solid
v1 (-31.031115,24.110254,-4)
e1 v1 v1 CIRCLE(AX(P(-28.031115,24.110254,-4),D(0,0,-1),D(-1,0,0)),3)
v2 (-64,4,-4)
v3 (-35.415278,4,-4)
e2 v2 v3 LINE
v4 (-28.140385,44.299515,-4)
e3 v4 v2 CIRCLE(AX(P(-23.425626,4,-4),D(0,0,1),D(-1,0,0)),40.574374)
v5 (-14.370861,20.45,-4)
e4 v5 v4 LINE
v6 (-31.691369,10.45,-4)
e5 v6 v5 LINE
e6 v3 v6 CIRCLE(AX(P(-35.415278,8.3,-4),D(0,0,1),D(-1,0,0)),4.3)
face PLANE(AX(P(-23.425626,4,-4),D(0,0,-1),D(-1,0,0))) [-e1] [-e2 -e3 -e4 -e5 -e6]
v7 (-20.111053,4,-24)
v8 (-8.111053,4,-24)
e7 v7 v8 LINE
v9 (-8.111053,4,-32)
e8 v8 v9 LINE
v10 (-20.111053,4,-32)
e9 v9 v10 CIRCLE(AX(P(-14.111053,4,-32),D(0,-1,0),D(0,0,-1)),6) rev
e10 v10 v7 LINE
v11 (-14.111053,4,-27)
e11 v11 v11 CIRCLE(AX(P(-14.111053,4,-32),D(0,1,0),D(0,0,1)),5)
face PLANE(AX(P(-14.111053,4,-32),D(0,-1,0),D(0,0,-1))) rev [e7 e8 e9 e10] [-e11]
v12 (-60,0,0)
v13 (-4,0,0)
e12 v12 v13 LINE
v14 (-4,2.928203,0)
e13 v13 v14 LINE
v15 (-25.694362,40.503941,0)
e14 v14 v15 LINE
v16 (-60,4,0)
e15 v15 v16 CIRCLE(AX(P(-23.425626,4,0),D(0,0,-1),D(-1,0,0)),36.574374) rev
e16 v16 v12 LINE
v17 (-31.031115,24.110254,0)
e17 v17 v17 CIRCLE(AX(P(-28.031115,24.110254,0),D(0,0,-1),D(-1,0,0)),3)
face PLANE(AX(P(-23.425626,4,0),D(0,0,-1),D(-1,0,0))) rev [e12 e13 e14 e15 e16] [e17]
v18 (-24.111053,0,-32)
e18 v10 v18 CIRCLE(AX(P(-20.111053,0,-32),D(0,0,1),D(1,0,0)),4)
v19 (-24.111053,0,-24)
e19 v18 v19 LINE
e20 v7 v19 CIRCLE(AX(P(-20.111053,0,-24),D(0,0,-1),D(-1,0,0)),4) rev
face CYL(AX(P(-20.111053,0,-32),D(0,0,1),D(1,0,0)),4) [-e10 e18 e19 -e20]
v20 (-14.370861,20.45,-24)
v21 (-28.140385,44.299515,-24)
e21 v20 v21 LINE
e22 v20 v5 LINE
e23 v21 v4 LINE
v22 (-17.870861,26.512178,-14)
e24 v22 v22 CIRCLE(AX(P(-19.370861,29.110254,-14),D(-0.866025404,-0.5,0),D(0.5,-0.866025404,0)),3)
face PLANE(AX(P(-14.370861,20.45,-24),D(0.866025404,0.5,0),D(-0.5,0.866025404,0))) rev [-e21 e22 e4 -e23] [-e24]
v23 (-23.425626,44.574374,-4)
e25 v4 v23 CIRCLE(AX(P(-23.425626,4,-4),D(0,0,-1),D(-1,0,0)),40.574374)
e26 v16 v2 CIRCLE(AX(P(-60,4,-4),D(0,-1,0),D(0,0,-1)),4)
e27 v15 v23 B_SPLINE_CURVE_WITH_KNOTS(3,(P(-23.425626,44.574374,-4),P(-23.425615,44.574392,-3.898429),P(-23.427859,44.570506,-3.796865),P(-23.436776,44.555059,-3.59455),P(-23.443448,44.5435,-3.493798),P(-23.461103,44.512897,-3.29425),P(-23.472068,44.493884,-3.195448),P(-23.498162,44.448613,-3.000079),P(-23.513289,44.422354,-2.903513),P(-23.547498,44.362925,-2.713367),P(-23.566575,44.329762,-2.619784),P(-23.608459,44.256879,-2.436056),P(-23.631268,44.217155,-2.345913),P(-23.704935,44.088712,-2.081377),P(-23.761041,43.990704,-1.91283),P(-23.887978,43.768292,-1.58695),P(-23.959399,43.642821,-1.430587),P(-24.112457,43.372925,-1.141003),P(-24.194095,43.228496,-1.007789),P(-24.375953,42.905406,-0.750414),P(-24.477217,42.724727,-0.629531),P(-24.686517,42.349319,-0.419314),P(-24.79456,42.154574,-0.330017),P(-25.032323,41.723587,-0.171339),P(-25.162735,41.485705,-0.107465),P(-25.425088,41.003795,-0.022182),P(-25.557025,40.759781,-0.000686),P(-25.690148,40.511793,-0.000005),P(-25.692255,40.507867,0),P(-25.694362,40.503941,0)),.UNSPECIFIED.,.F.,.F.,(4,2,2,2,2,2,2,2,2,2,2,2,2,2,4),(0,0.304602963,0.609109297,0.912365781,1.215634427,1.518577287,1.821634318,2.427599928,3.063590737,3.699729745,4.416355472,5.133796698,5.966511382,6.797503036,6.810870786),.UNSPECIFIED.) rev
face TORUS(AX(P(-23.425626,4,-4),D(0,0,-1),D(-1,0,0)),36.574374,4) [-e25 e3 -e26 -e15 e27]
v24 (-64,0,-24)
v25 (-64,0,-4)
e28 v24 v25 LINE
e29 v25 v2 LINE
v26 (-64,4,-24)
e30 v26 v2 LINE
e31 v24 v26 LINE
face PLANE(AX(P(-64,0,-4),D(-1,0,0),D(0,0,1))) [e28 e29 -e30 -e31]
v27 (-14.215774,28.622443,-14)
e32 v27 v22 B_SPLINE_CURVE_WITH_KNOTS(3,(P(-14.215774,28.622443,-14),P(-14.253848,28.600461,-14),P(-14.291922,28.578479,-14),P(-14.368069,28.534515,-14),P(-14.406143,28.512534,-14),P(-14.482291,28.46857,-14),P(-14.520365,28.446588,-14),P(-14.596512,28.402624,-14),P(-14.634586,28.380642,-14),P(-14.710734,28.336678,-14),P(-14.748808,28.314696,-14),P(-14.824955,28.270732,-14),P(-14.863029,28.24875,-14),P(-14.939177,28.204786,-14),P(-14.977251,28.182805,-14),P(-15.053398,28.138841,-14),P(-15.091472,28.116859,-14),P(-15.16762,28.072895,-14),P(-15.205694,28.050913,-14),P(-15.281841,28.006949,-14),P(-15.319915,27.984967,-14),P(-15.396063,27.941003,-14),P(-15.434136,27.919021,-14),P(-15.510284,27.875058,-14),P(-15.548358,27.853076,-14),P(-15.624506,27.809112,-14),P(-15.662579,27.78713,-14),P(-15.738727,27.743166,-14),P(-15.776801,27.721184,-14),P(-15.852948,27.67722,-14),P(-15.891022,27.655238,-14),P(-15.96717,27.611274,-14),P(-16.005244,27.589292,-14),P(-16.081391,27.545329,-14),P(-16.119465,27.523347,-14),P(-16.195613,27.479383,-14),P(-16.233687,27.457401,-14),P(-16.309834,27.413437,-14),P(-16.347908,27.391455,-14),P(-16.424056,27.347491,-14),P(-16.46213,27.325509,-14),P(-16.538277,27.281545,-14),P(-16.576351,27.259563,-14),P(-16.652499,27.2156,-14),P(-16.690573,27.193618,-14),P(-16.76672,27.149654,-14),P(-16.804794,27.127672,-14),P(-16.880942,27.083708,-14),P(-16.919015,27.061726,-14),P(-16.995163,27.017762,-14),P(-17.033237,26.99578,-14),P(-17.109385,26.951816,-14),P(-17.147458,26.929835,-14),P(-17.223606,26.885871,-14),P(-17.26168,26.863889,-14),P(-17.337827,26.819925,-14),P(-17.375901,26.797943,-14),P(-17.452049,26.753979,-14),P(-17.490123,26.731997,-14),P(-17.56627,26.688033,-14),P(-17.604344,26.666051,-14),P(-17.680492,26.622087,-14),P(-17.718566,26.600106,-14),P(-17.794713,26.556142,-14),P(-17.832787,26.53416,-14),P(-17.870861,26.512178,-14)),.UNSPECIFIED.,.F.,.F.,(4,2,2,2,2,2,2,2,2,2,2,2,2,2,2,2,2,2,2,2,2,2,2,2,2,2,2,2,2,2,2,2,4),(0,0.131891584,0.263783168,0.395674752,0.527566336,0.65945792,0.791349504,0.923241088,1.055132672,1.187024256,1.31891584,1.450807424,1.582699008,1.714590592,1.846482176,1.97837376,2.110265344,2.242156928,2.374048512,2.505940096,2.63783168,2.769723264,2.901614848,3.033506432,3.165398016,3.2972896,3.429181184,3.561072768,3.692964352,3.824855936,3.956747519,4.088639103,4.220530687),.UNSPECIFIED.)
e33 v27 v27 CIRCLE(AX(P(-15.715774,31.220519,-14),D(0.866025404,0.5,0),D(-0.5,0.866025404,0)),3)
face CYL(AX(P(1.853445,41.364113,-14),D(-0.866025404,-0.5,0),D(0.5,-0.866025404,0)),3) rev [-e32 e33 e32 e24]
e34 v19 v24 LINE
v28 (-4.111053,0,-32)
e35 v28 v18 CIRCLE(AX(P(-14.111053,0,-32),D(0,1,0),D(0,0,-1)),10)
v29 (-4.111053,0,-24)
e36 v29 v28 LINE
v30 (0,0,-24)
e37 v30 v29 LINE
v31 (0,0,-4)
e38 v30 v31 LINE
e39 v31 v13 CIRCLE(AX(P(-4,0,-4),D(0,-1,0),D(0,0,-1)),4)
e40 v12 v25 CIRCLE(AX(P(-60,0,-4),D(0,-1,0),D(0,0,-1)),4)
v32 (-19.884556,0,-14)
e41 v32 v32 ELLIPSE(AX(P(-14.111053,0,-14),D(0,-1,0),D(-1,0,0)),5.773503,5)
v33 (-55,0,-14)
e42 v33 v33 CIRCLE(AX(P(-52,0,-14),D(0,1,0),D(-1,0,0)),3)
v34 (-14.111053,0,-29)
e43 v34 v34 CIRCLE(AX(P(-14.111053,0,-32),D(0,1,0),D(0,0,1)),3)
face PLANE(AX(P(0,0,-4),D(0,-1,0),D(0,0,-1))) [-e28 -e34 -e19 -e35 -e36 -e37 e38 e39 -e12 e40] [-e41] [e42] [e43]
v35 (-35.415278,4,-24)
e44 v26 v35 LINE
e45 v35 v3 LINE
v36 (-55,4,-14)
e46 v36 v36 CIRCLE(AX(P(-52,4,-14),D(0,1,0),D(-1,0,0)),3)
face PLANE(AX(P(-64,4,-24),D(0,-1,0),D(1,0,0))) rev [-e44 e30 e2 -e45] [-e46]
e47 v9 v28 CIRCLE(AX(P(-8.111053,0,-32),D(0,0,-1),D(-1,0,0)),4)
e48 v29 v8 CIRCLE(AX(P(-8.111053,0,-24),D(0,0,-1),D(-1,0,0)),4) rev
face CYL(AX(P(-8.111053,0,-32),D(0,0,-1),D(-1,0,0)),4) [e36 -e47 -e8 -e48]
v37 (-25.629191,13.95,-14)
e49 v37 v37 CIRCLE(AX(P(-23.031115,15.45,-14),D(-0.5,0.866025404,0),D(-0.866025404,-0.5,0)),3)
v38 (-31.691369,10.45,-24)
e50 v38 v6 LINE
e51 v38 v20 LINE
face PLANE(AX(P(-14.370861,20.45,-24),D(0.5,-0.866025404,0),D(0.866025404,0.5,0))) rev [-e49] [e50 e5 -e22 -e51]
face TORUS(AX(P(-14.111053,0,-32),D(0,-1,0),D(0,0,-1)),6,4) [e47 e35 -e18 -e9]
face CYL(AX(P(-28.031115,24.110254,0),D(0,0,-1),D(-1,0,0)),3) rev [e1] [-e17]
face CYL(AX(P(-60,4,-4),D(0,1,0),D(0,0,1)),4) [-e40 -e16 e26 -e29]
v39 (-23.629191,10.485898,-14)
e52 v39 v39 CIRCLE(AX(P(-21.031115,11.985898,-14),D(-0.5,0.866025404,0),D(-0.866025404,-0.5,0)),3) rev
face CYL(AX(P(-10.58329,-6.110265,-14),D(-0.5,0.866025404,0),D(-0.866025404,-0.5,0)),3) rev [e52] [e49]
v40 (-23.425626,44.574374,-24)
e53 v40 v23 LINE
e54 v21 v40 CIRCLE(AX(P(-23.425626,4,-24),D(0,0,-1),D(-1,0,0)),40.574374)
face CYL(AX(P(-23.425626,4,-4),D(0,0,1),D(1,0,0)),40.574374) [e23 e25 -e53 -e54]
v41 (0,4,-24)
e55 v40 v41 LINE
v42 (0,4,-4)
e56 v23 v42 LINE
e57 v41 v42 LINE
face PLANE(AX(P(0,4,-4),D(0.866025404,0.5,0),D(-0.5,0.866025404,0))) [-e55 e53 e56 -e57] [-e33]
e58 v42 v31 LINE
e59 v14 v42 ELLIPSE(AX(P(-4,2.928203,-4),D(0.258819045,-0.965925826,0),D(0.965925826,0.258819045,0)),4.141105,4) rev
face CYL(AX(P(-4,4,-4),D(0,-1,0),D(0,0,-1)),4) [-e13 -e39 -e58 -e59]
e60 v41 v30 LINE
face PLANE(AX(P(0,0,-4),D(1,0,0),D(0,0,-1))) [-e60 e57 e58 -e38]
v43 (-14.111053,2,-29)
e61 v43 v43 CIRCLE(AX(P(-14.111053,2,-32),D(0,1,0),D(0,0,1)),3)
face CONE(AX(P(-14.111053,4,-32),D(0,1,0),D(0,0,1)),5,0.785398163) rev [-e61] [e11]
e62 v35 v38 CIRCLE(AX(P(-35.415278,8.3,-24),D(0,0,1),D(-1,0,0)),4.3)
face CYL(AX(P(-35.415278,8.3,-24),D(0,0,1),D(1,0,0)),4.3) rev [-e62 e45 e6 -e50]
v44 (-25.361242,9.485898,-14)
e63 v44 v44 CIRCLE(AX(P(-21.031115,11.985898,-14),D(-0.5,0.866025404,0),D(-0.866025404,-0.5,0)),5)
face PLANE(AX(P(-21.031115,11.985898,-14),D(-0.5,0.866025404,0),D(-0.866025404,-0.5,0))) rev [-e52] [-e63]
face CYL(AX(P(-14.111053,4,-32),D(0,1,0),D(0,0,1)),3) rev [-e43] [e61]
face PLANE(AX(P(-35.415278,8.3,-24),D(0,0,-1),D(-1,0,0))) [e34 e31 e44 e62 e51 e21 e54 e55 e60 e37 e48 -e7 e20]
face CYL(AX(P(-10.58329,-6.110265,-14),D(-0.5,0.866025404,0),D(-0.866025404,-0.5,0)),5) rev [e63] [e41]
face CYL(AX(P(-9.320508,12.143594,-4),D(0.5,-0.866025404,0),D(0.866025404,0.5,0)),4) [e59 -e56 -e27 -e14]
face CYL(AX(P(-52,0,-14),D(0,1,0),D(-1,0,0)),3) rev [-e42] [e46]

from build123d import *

# Parameters (mm, degrees)
BOSS_EXTRUDE1_DEPTH = 4
BOSS_EXTRUDE2_DEPTH = 20
SKETCH3_R           = 3
CUT_EXTRUDE1_DEPTH  = 62.345545492
SKETCH4_R           = 5
CUT_EXTRUDE2_DEPTH  = 65.381139123
SKETCH5_R           = 3
CUT_EXTRUDE3_DEPTH  = 81.725682082
SKETCH6_R           = 3
CUT_EXTRUDE4_DEPTH  = 80.48760808
SKETCH7_R           = 3
CUT_EXTRUDE5_DEPTH  = 81.516301651
BOSS_EXTRUDE3_DEPTH = 4
FILLET1_R           = 4
FILLET2_R           = 4


with BuildPart() as part:
    # Sketch1 → Boss-Extrude1 (new body)
    with BuildSketch(Plane.XY):
        with BuildLine():
            Line((0, 0), (0, 4))
            Line((0, 4), (-23.425625842, 44.574374158))
            ThreePointArc((-23.425625842, 44.574374158), (-52.116040952, 32.690415109), (-64, 4))
            Line((-64, 4), (-64, 0))
            Line((-64, 0), (0, 0))
        make_face()
    extrude(amount=-BOSS_EXTRUDE1_DEPTH)

    # Sketch2 → Boss-Extrude2 (add)
    with BuildSketch(Plane(origin=(0, 0, -4), x_dir=(-1, 0, 0), z_dir=(0, 0, -1))):
        with BuildLine():
            Line((64, 4), (35.415278297, 4))
            ThreePointArc((35.415278297, 4), (31.691369061, 6.15), (31.691369061, 10.45))
            Line((31.691369061, 10.45), (14.370860985, 20.45))
            Line((14.370860985, 20.45), (28.140384731, 44.299514723))
            ThreePointArc((28.140384731, 44.299514723), (25.787007804, 44.505601014), (23.425625842, 44.574374158))
            Line((23.425625842, 44.574374158), (0, 4))
            Line((0, 4), (0, 0))
            Line((0, 0), (64, 0))
            Line((64, 0), (64, 4))
        make_face()
    extrude(amount=BOSS_EXTRUDE2_DEPTH)

    # Sketch3 → Cut-Extrude1 (cut, through all)
    with BuildSketch(Plane(origin=(-12.447825, 21.560265344, 0), x_dir=(0.8660254037844387, 0.49999999999999983, 0), z_dir=(-0.49999999999999983, 0.8660254037844387, 0))):
        with Locations(Location((-12.220530687, 14, 0), (0, 0, 180))):
            Circle(SKETCH3_R)
    extrude(amount=-CUT_EXTRUDE1_DEPTH, mode=Mode.SUBTRACT)

    # Sketch4 → Cut-Extrude2 (cut, through all)
    with BuildSketch(Plane(origin=(-10.447825, 18.096163729, 0), x_dir=(-0.8660254037844387, -0.49999999999999983, 0), z_dir=(-0.49999999999999983, 0.8660254037844387, 0))):
        with Locations((12.220530687, -14)):
            Circle(SKETCH4_R)
    extrude(amount=-CUT_EXTRUDE2_DEPTH, mode=Mode.SUBTRACT)

    # Sketch5 → Cut-Extrude3 (cut, through all)
    with BuildSketch(Plane(origin=(-1.923035985, -1.110265344, 0), x_dir=(0, 0, 1), z_dir=(-0.8660254037844386, -0.5000000000000001, 0))):
        with Locations(Location((-14, 34.89565, 0), (0, 0, 270))):
            Circle(SKETCH5_R)
    extrude(amount=-CUT_EXTRUDE3_DEPTH, mode=Mode.SUBTRACT)

    # Sketch6 → Cut-Extrude4 (cut, through all)
    with BuildSketch(Plane(origin=(0, 4, 0), x_dir=(1, 0, 0), z_dir=(0, 1, 0))):
        with Locations(Location((-52, 14, 0), (0, 0, 180))):
            Circle(SKETCH6_R)
    extrude(amount=-CUT_EXTRUDE4_DEPTH, mode=Mode.SUBTRACT)

    # Sketch7 → Cut-Extrude5 (cut, through all)
    with BuildSketch(Plane(origin=(0, 0, -4), x_dir=(-1, 0, 0), z_dir=(0, 0, -1))):
        with Locations((28.031115023, 24.110254038)):
            Circle(SKETCH7_R)
    extrude(amount=-CUT_EXTRUDE5_DEPTH, mode=Mode.SUBTRACT)

    # Sketch8 → Boss-Extrude3 (add)
    with BuildSketch(Plane(origin=(0, 0, 0), x_dir=(1, 0, 0), z_dir=(0, 1, 0))):
        with BuildLine():
            Line((-24.111053364, 24), (-4.111053364, 24))
            Line((-4.111053364, 24), (-4.111053364, 32))
            ThreePointArc((-4.111053364, 32), (-14.111053364, 42), (-24.111053364, 32))
            Line((-24.111053364, 32), (-24.111053364, 24))
        make_face()
    extrude(amount=BOSS_EXTRUDE3_DEPTH)

    # Sketch9 → Cut-Revolve2 (revolve, cut)
    with BuildSketch(Plane.XY.offset(-32), mode=Mode.PRIVATE) as cut_revolve2_sk:
        Polygon((-17.111053364, 0), (-17.111053364, 2), (-19.111053364, 4), (-14.111053364, 4), (-14.111053364, 0), align=None)
    revolve(cut_revolve2_sk.sketch.rotate(Axis((-14.111053364, 4, -32), (0, -1, 0)), 270), axis=Axis((-14.111053364, 4, -32), (0, -1, 0)), mode=Mode.SUBTRACT)

    # Fillet1
    fillet1_edges = [part.edges().sort_by_distance(p)[0] for p in [
        (-24.111053364, 4, -28),
        (-14.111053364, 4, -42),
        (-4.111053364, 4, -28),
    ]]
    fillet(fillet1_edges, radius=FILLET1_R - 0.0001)  # a hair under: the kernel refuses the full size

    # Fillet2
    fillet2_edges = [part.edges().sort_by_distance(p)[0] for p in [
        (-64, 2, 0),
        (0, 2, 0),
        (-11.712812921, 24.287187079, 0),
        (-52.116040952, 32.690415109, 0),
    ]]
    fillet(fillet2_edges, radius=FILLET2_R - 0.0001)  # a hair under: the kernel refuses the full size


solid = part.part
